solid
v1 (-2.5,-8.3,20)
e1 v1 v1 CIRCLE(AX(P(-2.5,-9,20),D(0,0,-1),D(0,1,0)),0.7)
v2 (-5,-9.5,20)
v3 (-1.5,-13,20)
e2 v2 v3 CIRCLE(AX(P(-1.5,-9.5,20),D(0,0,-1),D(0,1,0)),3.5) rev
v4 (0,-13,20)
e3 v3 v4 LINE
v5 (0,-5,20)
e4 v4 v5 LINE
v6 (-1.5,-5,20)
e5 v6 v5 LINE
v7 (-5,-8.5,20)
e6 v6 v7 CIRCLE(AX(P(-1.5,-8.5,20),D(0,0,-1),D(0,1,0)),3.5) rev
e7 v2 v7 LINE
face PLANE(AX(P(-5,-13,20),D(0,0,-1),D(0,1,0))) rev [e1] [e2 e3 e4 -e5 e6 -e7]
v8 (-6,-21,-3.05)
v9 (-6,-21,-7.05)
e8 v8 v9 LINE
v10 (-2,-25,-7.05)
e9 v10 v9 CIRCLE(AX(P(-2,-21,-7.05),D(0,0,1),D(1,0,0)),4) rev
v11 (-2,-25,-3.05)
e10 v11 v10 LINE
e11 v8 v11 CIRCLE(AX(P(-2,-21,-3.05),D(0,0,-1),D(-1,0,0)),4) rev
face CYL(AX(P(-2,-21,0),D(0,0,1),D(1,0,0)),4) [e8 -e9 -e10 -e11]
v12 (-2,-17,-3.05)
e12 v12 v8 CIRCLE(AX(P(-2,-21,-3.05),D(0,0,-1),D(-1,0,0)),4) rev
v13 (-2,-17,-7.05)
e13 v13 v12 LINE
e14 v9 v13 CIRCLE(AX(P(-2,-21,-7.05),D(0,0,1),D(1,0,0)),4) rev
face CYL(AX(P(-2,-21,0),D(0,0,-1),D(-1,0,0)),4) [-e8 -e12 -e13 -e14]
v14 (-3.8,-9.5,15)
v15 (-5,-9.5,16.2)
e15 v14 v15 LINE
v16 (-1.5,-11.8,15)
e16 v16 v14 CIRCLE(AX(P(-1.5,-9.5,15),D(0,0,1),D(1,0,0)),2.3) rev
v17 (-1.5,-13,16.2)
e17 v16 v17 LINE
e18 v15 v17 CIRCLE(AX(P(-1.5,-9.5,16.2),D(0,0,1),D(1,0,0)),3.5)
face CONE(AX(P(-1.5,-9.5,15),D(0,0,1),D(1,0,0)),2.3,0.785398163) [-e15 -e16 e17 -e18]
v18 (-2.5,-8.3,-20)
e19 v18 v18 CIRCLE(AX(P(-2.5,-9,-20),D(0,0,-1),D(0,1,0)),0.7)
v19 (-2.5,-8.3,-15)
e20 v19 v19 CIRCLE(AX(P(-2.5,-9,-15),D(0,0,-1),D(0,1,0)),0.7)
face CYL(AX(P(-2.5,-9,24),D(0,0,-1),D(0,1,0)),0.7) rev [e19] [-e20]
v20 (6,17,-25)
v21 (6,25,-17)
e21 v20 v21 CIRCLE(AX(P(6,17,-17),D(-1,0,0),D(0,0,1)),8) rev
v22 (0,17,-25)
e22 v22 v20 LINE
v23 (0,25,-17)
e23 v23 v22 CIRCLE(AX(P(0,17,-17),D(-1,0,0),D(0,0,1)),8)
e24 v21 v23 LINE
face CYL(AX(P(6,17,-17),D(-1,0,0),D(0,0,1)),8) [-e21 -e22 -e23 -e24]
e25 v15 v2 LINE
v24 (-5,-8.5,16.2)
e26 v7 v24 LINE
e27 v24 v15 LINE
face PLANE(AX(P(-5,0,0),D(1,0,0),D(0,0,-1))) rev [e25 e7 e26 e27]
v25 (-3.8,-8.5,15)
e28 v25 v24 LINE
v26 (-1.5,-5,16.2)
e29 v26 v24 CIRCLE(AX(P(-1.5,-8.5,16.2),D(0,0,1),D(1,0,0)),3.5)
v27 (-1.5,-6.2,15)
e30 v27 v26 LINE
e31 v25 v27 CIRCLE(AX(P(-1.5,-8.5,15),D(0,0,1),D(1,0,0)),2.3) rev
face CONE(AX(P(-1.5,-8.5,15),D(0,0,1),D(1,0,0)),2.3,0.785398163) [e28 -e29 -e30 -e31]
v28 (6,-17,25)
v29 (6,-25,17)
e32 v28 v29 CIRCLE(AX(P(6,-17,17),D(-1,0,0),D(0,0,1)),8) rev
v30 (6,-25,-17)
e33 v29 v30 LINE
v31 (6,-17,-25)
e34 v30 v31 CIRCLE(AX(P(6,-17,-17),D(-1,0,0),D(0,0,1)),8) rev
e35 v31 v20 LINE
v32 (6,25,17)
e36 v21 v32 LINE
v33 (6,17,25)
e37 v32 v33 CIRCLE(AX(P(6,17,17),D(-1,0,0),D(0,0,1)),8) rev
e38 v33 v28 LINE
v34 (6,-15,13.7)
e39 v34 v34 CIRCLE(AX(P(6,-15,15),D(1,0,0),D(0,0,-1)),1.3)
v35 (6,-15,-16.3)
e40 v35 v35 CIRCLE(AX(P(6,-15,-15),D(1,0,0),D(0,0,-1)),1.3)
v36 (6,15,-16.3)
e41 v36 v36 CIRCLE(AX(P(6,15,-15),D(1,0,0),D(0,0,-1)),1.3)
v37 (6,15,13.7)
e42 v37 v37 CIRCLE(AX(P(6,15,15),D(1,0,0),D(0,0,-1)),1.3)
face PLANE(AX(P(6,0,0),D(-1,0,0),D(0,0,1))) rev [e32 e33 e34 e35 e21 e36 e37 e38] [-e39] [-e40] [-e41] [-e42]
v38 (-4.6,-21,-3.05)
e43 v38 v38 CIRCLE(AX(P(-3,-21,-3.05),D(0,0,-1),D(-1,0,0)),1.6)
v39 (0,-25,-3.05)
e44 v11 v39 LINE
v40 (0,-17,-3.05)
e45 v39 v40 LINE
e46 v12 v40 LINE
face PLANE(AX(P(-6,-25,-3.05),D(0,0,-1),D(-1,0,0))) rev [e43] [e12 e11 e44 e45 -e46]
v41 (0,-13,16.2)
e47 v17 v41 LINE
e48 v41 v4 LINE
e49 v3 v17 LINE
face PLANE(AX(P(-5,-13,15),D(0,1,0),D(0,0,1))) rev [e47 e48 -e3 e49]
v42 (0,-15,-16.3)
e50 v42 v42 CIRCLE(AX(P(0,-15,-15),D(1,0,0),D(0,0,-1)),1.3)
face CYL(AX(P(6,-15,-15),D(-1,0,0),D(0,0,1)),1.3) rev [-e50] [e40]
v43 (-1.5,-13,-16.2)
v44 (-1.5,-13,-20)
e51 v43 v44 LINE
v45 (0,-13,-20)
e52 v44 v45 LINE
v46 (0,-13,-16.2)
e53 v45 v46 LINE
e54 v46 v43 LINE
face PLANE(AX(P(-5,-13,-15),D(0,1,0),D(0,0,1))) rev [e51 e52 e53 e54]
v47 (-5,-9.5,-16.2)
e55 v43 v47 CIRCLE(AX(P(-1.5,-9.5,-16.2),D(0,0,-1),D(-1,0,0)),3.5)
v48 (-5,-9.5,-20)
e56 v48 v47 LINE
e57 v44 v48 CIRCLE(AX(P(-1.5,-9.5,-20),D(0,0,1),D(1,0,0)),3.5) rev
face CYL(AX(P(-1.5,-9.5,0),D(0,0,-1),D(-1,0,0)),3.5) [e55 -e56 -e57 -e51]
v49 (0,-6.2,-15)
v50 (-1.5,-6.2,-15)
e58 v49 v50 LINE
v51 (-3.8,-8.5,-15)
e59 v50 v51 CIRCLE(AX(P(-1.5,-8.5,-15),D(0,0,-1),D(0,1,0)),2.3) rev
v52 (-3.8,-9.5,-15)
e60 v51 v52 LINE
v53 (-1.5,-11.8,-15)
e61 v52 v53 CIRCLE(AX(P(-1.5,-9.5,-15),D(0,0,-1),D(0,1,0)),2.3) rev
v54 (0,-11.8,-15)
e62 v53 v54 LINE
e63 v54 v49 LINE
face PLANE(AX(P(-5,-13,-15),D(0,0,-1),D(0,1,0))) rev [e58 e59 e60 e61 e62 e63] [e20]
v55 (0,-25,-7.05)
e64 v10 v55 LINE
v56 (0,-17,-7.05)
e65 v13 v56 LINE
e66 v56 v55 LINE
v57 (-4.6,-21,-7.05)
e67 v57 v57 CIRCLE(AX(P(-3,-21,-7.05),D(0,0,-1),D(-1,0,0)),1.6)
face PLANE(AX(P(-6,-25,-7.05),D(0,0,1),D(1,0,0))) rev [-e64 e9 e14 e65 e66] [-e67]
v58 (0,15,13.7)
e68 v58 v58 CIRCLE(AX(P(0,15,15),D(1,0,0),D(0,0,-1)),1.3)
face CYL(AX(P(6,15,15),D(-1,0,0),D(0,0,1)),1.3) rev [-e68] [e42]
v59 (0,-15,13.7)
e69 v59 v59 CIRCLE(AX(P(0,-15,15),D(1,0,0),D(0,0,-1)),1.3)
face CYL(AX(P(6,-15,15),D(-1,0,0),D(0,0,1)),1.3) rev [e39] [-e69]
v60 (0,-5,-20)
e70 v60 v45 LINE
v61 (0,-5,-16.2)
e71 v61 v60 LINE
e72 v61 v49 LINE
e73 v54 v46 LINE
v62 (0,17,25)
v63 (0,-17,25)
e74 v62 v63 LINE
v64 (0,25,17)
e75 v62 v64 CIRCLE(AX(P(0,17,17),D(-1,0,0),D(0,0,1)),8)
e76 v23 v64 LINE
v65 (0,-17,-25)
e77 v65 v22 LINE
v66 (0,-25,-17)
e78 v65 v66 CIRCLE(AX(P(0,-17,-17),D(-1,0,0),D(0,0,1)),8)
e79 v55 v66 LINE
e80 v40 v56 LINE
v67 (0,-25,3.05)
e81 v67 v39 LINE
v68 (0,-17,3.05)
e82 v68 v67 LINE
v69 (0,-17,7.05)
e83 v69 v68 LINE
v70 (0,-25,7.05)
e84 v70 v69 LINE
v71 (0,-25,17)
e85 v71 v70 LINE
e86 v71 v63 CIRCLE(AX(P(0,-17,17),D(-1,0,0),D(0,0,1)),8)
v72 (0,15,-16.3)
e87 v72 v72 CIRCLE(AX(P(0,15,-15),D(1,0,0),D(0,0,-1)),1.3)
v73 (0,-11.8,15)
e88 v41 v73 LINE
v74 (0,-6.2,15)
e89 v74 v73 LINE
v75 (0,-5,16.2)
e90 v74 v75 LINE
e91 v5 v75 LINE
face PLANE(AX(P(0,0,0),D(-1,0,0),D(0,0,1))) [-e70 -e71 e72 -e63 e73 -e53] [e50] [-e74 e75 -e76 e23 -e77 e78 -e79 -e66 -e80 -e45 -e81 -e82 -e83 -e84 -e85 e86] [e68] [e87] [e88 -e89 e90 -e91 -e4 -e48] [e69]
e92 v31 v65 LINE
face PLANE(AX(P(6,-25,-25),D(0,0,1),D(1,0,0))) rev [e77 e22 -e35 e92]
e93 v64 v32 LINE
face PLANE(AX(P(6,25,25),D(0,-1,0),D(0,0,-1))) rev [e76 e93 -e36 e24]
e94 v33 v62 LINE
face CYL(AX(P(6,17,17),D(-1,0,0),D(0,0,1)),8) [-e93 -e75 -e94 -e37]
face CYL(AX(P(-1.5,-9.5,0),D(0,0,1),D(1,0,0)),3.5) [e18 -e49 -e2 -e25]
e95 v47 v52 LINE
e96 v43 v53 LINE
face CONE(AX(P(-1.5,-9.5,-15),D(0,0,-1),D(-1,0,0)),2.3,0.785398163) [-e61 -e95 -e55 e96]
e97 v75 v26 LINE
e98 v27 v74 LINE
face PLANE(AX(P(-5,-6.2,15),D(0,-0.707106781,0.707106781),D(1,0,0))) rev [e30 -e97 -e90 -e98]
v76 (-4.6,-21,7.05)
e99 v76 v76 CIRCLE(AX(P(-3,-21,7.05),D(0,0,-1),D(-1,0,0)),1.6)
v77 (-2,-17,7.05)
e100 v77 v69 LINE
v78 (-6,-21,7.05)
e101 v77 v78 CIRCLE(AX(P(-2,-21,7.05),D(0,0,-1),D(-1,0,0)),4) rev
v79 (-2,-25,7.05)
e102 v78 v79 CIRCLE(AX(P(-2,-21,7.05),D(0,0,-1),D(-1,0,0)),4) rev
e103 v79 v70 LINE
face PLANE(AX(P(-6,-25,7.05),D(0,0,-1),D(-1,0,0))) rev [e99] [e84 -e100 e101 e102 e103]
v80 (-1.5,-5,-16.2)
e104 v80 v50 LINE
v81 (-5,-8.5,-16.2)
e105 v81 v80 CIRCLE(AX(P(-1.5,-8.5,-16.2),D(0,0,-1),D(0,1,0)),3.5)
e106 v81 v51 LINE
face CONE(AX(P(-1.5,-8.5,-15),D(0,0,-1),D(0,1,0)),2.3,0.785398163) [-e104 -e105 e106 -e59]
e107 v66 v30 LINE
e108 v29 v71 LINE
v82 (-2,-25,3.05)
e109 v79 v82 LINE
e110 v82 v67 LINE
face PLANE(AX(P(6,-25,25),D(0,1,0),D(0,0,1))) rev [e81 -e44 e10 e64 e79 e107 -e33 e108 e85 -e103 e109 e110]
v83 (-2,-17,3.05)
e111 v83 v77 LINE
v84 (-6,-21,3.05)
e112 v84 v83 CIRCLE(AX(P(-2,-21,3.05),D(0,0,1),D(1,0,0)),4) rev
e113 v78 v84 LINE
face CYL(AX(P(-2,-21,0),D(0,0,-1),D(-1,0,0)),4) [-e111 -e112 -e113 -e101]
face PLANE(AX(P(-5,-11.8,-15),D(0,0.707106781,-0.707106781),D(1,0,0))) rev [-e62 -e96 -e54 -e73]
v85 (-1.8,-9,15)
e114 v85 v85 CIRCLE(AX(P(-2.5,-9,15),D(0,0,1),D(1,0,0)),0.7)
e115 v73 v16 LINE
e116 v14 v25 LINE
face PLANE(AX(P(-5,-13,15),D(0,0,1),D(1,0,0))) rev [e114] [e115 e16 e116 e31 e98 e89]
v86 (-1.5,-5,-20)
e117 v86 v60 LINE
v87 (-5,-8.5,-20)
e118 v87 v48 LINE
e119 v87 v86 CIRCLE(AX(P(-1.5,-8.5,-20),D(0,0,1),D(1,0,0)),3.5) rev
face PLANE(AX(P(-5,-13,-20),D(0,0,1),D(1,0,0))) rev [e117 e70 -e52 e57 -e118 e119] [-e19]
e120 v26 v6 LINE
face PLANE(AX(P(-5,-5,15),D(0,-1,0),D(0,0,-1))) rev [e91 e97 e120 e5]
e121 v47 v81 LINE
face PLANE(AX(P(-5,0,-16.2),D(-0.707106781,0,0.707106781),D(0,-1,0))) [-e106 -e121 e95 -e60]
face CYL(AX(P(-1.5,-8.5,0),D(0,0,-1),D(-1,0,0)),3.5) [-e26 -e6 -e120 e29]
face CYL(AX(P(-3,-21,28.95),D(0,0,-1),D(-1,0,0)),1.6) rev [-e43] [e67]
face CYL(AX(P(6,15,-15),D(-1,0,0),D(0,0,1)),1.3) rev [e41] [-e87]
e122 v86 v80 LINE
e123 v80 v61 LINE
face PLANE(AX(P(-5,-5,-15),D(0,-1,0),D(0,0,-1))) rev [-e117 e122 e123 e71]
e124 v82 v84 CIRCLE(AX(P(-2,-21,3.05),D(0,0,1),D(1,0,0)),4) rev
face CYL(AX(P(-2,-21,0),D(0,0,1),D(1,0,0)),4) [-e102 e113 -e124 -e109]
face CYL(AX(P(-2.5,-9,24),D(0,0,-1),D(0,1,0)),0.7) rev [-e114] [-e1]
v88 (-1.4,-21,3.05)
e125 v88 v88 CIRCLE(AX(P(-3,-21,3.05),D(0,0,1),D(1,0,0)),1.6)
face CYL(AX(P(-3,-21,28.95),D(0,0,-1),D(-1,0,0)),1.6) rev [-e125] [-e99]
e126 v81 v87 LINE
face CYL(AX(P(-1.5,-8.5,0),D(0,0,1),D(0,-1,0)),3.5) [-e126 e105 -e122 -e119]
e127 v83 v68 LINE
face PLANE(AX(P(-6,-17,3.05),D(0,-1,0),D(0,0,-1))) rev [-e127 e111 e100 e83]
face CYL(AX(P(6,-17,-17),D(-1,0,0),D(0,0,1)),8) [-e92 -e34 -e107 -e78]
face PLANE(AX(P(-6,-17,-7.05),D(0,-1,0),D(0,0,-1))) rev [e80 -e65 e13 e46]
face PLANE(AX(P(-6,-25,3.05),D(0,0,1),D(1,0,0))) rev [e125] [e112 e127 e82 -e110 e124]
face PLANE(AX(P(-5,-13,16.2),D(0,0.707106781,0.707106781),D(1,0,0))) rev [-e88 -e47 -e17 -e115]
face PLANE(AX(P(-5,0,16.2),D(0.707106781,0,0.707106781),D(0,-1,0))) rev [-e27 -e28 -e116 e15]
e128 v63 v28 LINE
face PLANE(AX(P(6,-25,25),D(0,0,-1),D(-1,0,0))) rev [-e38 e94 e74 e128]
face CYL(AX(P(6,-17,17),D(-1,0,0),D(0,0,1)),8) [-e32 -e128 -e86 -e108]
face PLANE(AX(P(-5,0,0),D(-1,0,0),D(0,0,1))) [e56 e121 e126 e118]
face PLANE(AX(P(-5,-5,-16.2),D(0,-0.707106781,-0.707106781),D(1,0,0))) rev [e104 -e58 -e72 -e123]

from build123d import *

# Parameters (mm, degrees)
SKETCH1_W           = 50
SKETCH1_H           = 50
SKETCH1_R           = 1.3
BOSS_EXTRUDE1_DEPTH = 6
FILLET1_R           = 8
SKETCH2_W           = 4
SKETCH2_H           = 8
BOSS_EXTRUDE2_DEPTH = 6
FILLET2_R           = 4
SKETCH6_R           = 1.6
CUT_EXTRUDE3_DEPTH  = 36
SKETCH4_W           = 5
SKETCH4_H           = 8
BOSS_EXTRUDE4_DEPTH = 5
FILLET3_R           = 3.5
SKETCH5_R           = 0.7
CUT_EXTRUDE2_DEPTH  = 44
CHAMFER3_SIZE       = 1.2


with BuildPart() as part:
    # Sketch1 → Boss-Extrude1 (new body)
    with BuildSketch(Plane(origin=(0, 0, 0), x_dir=(0, 0, -1), z_dir=(1, 0, 0))):
        Rectangle(SKETCH1_W, SKETCH1_H)
        with Locations((-15, 15)):
            Circle(SKETCH1_R, mode=Mode.SUBTRACT)
        with Locations((15, 15)):
            Circle(SKETCH1_R, mode=Mode.SUBTRACT)
        with Locations((15, -15)):
            Circle(SKETCH1_R, mode=Mode.SUBTRACT)
        with Locations((-15, -15)):
            Circle(SKETCH1_R, mode=Mode.SUBTRACT)
    extrude(amount=BOSS_EXTRUDE1_DEPTH)

    # Fillet1
    fillet1_edges = [part.edges().sort_by_distance(p)[0] for p in [
        (3, -25, -25),
        (3, -25, 25),
        (3, 25, 25),
        (3, 25, -25),
    ]]
    fillet(fillet1_edges, radius=FILLET1_R)

    # Sketch2 → Boss-Extrude2 (add)
    with BuildSketch(Plane.ZY):
        with Locations((-5.05, -21)):
            Rectangle(SKETCH2_W, SKETCH2_H)
        with Locations((5.05, -21)):
            Rectangle(SKETCH2_W, SKETCH2_H)
    extrude(amount=BOSS_EXTRUDE2_DEPTH)

    # Fillet2
    fillet2_edges = [part.edges().sort_by_distance(p)[0] for p in [
        (-6, -25, 5.05),
        (-6, -25, -5.05),
        (-6, -17, -5.05),
        (-6, -17, 5.05),
    ]]
    fillet(fillet2_edges, radius=FILLET2_R - 0.0001)  # a hair under: the kernel refuses the full size

    # Sketch6 → Cut-Extrude3 (cut)
    with BuildSketch(Plane(origin=(0, 0, -7.05), x_dir=(-1, 0, 0), z_dir=(0, 0, -1))):
        with Locations((3, -21)):
            Circle(SKETCH6_R)
    extrude(amount=-CUT_EXTRUDE3_DEPTH, mode=Mode.SUBTRACT)

    # Sketch4 → Boss-Extrude4 (add)
    with BuildSketch(Plane.ZY):
        with Locations((-17.5, -9)):
            Rectangle(SKETCH4_W, SKETCH4_H)
        with Locations((17.5, -9)):
            Rectangle(SKETCH4_W, SKETCH4_H)
    extrude(amount=BOSS_EXTRUDE4_DEPTH)

    # Fillet3
    fillet3_edges = [part.edges().sort_by_distance(p)[0] for p in [
        (-5, -5, -17.5),
        (-5, -13, -17.5),
        (-5, -13, 17.5),
        (-5, -5, 17.5),
    ]]
    fillet(fillet3_edges, radius=FILLET3_R)

    # Sketch5 → Cut-Extrude2 (cut)
    with BuildSketch(Plane(origin=(0, 0, -20), x_dir=(-1, 0, 0), z_dir=(0, 0, -1))):
        with Locations(Location((2.5, -9, 0), (0, 0, 90))):
            Circle(SKETCH5_R)
    extrude(amount=-CUT_EXTRUDE2_DEPTH, mode=Mode.SUBTRACT)

    # Chamfer3
    chamfer3_edges = [part.edges().sort_by_distance(p)[0] for p in [
        (-5, -9, 15),
        (-0.75, -13, 15),
        (-0.75, -5, 15),
        (-3.974873734, -6.025126266, 15),
        (-3.974873734, -11.974873734, 15),
        (-5, -9, -15),
        (-0.75, -5, -15),
        (-0.75, -13, -15),
        (-3.974873734, -6.025126266, -15),
        (-3.974873734, -11.974873734, -15),
    ]]
    chamfer(chamfer3_edges, length=CHAMFER3_SIZE)


solid = part.part
